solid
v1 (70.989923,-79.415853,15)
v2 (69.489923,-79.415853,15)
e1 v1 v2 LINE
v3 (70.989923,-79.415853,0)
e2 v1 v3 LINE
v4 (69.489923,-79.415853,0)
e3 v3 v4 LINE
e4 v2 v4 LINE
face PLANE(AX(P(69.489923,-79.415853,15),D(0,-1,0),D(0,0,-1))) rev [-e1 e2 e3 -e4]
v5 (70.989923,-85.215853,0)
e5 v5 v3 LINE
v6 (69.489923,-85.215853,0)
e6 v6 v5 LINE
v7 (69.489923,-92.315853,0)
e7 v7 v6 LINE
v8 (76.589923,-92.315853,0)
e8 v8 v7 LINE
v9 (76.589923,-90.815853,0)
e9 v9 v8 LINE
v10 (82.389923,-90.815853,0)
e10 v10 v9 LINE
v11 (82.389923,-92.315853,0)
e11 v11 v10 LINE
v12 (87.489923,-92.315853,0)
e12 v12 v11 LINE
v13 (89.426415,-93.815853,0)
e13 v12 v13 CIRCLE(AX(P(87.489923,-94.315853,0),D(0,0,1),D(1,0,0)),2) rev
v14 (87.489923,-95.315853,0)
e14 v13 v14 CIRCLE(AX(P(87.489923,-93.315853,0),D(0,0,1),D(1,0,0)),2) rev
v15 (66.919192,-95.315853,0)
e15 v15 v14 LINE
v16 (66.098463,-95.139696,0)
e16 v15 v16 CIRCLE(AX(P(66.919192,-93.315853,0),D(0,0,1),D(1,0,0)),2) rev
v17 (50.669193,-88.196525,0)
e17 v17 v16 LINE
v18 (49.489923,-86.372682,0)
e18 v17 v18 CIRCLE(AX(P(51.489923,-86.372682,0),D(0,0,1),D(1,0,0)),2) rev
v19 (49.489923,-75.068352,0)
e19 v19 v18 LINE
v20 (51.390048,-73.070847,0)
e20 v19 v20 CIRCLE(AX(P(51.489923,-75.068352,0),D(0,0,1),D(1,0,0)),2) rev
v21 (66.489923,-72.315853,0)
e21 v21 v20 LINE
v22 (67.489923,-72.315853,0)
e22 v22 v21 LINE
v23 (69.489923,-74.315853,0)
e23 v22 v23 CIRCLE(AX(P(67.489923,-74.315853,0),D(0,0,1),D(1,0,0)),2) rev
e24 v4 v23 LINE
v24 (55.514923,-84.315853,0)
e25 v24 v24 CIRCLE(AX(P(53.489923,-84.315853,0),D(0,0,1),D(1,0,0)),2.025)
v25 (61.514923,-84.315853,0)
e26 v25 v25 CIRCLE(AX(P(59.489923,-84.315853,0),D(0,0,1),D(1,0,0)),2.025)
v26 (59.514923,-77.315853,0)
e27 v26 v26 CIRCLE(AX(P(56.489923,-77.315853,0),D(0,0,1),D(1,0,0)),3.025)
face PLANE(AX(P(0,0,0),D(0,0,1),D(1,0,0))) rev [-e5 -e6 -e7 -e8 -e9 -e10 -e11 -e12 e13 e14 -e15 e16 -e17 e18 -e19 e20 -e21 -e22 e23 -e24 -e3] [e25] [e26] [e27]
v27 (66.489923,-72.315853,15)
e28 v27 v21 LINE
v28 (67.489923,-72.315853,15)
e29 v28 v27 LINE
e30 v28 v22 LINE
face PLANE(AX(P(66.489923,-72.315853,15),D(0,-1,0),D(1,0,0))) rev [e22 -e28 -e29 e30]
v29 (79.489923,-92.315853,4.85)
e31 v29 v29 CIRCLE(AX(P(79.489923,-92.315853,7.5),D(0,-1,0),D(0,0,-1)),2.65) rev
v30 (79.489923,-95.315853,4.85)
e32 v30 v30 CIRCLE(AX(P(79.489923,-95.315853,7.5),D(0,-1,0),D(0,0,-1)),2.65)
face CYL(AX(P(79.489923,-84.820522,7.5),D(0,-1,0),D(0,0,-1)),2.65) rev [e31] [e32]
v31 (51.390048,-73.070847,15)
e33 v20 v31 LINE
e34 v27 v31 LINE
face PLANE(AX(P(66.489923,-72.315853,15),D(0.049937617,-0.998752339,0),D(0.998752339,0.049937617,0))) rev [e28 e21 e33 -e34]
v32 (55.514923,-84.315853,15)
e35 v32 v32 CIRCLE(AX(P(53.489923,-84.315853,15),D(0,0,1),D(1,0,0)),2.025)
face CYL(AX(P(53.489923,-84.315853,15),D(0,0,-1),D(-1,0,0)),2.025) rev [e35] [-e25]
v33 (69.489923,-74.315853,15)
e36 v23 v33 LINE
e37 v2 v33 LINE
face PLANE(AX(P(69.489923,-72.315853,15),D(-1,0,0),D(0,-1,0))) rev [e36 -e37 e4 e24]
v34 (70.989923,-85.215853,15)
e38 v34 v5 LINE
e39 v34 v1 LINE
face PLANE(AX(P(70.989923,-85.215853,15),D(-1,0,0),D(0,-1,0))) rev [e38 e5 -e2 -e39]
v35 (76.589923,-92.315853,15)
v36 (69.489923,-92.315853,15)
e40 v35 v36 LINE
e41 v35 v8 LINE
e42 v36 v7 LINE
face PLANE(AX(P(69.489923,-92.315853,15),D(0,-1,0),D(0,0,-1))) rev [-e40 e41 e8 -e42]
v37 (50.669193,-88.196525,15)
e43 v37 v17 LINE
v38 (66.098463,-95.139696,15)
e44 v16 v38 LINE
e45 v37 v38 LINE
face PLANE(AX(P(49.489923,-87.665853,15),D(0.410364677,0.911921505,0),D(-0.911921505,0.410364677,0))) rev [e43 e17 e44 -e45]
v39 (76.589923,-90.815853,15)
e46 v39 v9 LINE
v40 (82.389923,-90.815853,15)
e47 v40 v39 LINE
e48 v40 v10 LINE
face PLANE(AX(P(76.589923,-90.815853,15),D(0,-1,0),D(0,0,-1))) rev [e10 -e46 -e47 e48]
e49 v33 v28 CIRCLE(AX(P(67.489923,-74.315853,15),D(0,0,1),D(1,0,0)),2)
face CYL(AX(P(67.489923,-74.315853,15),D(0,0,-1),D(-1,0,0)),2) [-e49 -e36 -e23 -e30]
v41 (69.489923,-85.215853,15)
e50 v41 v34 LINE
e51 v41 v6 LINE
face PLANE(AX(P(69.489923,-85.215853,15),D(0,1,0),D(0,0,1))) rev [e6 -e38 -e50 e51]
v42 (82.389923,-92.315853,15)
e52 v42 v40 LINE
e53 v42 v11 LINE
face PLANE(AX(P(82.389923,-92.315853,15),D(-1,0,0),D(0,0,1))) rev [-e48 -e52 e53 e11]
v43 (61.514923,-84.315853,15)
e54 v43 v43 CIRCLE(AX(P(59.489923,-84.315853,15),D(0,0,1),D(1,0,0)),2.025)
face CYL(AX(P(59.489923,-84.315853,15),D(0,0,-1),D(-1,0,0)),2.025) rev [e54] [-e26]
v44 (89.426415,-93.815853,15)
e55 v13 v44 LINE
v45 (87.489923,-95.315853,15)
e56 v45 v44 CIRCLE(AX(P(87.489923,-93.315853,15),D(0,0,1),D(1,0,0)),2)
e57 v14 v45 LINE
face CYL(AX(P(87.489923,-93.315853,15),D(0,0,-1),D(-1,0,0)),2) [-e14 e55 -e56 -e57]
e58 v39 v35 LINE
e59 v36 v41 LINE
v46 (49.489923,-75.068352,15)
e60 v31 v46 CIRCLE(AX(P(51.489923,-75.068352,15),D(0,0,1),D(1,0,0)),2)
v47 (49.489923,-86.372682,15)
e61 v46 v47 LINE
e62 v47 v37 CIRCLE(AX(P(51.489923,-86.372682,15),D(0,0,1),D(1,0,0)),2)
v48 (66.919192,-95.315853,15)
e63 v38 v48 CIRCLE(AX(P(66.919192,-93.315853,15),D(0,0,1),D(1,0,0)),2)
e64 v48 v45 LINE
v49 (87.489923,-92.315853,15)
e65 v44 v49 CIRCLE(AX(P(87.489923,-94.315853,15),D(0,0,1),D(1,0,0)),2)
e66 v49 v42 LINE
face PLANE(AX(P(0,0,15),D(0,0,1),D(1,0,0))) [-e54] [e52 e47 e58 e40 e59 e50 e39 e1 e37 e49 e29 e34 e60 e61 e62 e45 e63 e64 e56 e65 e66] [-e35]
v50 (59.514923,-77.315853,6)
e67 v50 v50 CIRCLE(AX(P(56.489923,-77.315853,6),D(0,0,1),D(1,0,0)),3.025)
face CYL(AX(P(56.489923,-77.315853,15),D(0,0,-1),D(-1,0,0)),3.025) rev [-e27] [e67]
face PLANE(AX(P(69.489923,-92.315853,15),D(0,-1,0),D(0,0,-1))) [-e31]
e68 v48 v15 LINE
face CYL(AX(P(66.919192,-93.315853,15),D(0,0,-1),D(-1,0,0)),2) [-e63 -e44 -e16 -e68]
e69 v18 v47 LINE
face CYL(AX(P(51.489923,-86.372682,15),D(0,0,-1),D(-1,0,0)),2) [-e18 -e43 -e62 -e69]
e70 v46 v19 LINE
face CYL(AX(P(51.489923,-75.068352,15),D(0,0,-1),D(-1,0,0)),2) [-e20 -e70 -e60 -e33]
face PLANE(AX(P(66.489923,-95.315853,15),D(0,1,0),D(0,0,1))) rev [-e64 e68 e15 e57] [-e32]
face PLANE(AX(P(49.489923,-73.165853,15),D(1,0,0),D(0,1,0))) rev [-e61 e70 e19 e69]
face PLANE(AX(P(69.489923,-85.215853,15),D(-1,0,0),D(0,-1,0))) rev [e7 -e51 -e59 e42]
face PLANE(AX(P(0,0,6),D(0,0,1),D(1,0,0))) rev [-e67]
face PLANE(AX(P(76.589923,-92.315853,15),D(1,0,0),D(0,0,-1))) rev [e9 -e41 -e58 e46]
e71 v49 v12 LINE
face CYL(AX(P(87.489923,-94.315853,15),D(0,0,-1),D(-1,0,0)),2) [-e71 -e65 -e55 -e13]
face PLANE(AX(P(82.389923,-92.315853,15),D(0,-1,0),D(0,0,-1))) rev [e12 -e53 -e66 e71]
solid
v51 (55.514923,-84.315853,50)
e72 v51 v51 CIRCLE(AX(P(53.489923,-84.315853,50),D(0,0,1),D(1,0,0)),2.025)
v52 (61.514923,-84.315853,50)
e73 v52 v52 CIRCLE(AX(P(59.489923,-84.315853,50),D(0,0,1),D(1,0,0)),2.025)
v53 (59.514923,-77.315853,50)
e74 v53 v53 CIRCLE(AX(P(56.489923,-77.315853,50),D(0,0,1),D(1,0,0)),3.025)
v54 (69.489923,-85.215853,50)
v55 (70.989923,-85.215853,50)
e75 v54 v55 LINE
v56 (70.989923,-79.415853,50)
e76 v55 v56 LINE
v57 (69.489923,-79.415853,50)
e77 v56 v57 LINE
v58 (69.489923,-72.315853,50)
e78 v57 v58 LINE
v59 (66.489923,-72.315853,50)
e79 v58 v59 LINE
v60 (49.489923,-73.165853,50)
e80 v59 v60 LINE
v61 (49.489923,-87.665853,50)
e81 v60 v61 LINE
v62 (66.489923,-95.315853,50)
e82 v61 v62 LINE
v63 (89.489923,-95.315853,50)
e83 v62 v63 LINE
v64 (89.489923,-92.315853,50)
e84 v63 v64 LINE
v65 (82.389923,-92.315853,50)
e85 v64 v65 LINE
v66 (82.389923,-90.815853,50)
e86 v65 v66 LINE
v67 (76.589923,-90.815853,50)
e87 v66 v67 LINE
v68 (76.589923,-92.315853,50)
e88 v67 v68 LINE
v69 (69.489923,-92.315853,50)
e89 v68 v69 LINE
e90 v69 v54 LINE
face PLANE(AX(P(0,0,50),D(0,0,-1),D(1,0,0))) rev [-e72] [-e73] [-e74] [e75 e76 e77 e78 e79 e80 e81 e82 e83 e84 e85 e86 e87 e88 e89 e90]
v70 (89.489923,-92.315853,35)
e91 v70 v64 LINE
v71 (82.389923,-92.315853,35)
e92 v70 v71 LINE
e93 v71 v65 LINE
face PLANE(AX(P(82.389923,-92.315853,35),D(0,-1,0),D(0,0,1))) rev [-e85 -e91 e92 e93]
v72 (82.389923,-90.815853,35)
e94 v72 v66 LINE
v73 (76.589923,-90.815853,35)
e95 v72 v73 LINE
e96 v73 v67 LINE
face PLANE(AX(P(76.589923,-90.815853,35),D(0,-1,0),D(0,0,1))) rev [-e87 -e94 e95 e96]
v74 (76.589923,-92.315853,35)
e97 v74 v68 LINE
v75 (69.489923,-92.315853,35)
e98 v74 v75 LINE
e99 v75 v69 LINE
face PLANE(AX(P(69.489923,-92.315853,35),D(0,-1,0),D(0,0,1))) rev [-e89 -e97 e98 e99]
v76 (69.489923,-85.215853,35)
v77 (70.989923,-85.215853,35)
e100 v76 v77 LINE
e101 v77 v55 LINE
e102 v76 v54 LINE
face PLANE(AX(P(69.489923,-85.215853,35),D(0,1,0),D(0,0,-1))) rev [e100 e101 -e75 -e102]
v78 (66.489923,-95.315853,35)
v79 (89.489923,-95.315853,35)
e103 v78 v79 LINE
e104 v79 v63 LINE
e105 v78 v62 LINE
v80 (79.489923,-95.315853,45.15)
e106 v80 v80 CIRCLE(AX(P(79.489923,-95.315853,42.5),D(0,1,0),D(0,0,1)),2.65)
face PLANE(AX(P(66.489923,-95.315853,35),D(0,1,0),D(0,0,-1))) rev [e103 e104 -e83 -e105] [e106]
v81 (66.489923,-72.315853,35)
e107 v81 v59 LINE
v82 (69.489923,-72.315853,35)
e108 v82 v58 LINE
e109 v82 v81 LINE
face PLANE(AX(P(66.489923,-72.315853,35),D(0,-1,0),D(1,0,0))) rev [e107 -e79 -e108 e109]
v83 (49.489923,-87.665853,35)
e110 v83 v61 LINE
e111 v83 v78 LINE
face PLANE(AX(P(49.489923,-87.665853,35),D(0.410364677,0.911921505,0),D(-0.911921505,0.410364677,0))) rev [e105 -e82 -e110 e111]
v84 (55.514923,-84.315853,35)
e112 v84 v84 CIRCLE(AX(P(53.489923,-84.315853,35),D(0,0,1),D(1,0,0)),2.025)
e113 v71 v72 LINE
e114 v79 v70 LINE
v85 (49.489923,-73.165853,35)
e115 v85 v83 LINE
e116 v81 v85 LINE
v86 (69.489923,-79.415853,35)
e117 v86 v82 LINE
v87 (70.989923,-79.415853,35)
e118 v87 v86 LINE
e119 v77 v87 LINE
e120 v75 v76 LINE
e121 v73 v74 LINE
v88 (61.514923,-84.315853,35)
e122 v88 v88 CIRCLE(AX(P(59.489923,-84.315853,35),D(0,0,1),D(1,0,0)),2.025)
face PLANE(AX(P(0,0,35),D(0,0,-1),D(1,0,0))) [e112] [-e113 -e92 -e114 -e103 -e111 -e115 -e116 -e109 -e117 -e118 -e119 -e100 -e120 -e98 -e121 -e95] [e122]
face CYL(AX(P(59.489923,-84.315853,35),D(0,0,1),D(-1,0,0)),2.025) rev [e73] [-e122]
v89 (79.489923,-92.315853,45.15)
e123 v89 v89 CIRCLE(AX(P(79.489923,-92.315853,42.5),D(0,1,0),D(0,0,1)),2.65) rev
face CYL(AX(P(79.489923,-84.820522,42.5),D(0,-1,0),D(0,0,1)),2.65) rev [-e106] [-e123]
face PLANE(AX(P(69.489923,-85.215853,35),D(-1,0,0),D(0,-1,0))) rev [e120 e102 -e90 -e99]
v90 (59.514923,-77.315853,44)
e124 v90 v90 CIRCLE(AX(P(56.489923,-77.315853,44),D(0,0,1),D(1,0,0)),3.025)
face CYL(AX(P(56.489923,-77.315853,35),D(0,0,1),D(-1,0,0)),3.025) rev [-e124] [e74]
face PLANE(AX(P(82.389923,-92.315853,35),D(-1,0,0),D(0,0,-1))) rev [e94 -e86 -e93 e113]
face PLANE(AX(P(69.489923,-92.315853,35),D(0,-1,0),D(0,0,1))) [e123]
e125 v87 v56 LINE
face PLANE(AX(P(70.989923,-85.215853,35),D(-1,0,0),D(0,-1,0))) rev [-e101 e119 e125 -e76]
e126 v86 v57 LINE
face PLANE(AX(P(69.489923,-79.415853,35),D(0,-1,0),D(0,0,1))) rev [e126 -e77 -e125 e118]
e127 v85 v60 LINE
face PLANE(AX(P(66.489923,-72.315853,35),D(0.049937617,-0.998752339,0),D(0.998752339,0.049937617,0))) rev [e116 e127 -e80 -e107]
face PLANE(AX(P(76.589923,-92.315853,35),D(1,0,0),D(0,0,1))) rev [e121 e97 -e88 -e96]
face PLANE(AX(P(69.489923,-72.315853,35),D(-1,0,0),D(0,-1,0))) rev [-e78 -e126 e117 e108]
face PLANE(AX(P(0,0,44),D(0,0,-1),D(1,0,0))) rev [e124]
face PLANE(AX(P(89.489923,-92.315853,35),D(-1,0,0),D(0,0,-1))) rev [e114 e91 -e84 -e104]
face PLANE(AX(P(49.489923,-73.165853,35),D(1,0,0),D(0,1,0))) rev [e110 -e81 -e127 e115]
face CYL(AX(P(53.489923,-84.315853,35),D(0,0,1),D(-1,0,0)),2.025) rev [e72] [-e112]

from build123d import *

# Parameters (mm, degrees)
SKETCH1_R           = 3.025
SKETCH1_R_2         = 2.025
BOSS_EXTRUDE1_DEPTH = 15
BOSS_EXTRUDE2_START = 6
SKETCH1_2_R         = 3.025
BOSS_EXTRUDE2_DEPTH = 9
SKETCH2_R           = 2.65
CUT_EXTRUDE1_DEPTH  = 3
FILLET1_R           = 2


with BuildPart() as part:
    # Sketch1 → Boss-Extrude1 (new body)
    with BuildSketch(Plane.XY):
        Polygon((66.489922843, -72.31585339), (69.489922843, -72.31585339), (69.489922843, -79.41585339), (70.989922843, -79.41585339), (70.989922843, -85.21585339), (69.489922843, -85.21585339), (69.489922843, -92.31585339), (76.589922843, -92.31585339), (76.589922843, -90.81585339), (82.389922843, -90.81585339), (82.389922843, -92.31585339), (89.489922843, -92.31585339), (89.489922843, -95.31585339), (66.489922843, -95.31585339), (49.489922843, -87.66585339), (49.489922843, -73.16585339), align=None)
        with Locations((56.489922843, -77.31585339)):
            Circle(SKETCH1_R, mode=Mode.SUBTRACT)
        with Locations((53.489922843, -84.31585339)):
            Circle(SKETCH1_R_2, mode=Mode.SUBTRACT)
        with Locations((59.489922843, -84.31585339)):
            Circle(SKETCH1_R_2, mode=Mode.SUBTRACT)
    extrude(amount=BOSS_EXTRUDE1_DEPTH)

    # Sketch1<2> → Boss-Extrude2 (add)
    with BuildSketch(Plane.XY.offset(BOSS_EXTRUDE2_START)):
        with Locations((56.489922843, -77.31585339)):
            Circle(SKETCH1_2_R)
    extrude(amount=BOSS_EXTRUDE2_DEPTH)

    # Sketch2 → Cut-Extrude1 (cut)
    with BuildSketch(Plane.XZ.offset(95.31585339)):
        with Locations(Location((79.489922843, 7.5, 0), (0, 0, 270))):
            Circle(SKETCH2_R)
    extrude(amount=-CUT_EXTRUDE1_DEPTH, mode=Mode.SUBTRACT)


with BuildPart() as body_2:
    # Mirror4: mirrored copy
    add(part.part.mirror(Plane.XY.offset(25)))


with BuildPart() as part_1:
    add(part.part)

    # Fillet1
    # the kernel refuses this fillet: 2 mm, written as the material it takes off along each edge
    with BuildSketch(Plane(origin=(89.489922843, -95.31585339, -5), x_dir=(0, 1, 0), z_dir=(0, 0, 1)), Plane(origin=(89.489922843, -92.31585339, -5), x_dir=(-1, 0, 0), z_dir=(0, 0, 1)), Plane(origin=(69.489922843, -72.31585339, -5), x_dir=(-1, 0, 0), z_dir=(0, 0, 1))) as fillet1_piece_1:
        with BuildLine():
            CenterArc((FILLET1_R, FILLET1_R), FILLET1_R, 180, 90)
            Line((0, FILLET1_R), (0, 0))
            Line((0, 0), (FILLET1_R, 0))
        make_face()
    extrude(amount=25, mode=Mode.SUBTRACT)
    with BuildSketch(Plane(origin=(66.489922843, -95.31585339, -1.073173444), x_dir=(1, 0, 0), z_dir=(0, 0, 1))) as fillet1_piece_2:
        with BuildLine():
            CenterArc((FILLET1_R * 0.214634688829, FILLET1_R), FILLET1_R, 245.772254682, 24.227745318)
            Line((-FILLET1_R * 0.1957299885, FILLET1_R * 0.0880784948249), (0, 0))
            Line((0, 0), (FILLET1_R * 0.214634688829, 0))
        make_face()
    extrude(amount=17.146346888, mode=Mode.SUBTRACT)
    with BuildSketch(Plane(origin=(49.489922843, -87.66585339, -3.23292805), x_dir=(0, 1, 0), z_dir=(0, 0, 1))) as fillet1_piece_3:
        with BuildLine():
            CenterArc((FILLET1_R * 0.646585609973, -FILLET1_R), FILLET1_R, 90, 65.772254682)
            Line((-FILLET1_R * 0.265335895202, -FILLET1_R * 0.589635322671), (0, 0))
            Line((0, 0), (FILLET1_R * 0.646585609973, 0))
        make_face()
    extrude(amount=21.4658561, mode=Mode.SUBTRACT)
    with BuildSketch(Plane(origin=(49.489922843, -73.16585339, -4.756246099), x_dir=(0.9987523388778446, 0.0499376169438941, 0), z_dir=(0, 0, 1))) as fillet1_piece_4:
        with BuildLine():
            CenterArc((FILLET1_R * 0.951249219725, -FILLET1_R), FILLET1_R, 90, 87.137594774)
            Line((-FILLET1_R * 0.0475031191528, -FILLET1_R * 0.950062383056), (0, 0))
            Line((0, 0), (FILLET1_R * 0.951249219725, 0))
        make_face()
    extrude(amount=24.512492197, mode=Mode.SUBTRACT)


solid = Compound([body_2.part, part_1.part])
